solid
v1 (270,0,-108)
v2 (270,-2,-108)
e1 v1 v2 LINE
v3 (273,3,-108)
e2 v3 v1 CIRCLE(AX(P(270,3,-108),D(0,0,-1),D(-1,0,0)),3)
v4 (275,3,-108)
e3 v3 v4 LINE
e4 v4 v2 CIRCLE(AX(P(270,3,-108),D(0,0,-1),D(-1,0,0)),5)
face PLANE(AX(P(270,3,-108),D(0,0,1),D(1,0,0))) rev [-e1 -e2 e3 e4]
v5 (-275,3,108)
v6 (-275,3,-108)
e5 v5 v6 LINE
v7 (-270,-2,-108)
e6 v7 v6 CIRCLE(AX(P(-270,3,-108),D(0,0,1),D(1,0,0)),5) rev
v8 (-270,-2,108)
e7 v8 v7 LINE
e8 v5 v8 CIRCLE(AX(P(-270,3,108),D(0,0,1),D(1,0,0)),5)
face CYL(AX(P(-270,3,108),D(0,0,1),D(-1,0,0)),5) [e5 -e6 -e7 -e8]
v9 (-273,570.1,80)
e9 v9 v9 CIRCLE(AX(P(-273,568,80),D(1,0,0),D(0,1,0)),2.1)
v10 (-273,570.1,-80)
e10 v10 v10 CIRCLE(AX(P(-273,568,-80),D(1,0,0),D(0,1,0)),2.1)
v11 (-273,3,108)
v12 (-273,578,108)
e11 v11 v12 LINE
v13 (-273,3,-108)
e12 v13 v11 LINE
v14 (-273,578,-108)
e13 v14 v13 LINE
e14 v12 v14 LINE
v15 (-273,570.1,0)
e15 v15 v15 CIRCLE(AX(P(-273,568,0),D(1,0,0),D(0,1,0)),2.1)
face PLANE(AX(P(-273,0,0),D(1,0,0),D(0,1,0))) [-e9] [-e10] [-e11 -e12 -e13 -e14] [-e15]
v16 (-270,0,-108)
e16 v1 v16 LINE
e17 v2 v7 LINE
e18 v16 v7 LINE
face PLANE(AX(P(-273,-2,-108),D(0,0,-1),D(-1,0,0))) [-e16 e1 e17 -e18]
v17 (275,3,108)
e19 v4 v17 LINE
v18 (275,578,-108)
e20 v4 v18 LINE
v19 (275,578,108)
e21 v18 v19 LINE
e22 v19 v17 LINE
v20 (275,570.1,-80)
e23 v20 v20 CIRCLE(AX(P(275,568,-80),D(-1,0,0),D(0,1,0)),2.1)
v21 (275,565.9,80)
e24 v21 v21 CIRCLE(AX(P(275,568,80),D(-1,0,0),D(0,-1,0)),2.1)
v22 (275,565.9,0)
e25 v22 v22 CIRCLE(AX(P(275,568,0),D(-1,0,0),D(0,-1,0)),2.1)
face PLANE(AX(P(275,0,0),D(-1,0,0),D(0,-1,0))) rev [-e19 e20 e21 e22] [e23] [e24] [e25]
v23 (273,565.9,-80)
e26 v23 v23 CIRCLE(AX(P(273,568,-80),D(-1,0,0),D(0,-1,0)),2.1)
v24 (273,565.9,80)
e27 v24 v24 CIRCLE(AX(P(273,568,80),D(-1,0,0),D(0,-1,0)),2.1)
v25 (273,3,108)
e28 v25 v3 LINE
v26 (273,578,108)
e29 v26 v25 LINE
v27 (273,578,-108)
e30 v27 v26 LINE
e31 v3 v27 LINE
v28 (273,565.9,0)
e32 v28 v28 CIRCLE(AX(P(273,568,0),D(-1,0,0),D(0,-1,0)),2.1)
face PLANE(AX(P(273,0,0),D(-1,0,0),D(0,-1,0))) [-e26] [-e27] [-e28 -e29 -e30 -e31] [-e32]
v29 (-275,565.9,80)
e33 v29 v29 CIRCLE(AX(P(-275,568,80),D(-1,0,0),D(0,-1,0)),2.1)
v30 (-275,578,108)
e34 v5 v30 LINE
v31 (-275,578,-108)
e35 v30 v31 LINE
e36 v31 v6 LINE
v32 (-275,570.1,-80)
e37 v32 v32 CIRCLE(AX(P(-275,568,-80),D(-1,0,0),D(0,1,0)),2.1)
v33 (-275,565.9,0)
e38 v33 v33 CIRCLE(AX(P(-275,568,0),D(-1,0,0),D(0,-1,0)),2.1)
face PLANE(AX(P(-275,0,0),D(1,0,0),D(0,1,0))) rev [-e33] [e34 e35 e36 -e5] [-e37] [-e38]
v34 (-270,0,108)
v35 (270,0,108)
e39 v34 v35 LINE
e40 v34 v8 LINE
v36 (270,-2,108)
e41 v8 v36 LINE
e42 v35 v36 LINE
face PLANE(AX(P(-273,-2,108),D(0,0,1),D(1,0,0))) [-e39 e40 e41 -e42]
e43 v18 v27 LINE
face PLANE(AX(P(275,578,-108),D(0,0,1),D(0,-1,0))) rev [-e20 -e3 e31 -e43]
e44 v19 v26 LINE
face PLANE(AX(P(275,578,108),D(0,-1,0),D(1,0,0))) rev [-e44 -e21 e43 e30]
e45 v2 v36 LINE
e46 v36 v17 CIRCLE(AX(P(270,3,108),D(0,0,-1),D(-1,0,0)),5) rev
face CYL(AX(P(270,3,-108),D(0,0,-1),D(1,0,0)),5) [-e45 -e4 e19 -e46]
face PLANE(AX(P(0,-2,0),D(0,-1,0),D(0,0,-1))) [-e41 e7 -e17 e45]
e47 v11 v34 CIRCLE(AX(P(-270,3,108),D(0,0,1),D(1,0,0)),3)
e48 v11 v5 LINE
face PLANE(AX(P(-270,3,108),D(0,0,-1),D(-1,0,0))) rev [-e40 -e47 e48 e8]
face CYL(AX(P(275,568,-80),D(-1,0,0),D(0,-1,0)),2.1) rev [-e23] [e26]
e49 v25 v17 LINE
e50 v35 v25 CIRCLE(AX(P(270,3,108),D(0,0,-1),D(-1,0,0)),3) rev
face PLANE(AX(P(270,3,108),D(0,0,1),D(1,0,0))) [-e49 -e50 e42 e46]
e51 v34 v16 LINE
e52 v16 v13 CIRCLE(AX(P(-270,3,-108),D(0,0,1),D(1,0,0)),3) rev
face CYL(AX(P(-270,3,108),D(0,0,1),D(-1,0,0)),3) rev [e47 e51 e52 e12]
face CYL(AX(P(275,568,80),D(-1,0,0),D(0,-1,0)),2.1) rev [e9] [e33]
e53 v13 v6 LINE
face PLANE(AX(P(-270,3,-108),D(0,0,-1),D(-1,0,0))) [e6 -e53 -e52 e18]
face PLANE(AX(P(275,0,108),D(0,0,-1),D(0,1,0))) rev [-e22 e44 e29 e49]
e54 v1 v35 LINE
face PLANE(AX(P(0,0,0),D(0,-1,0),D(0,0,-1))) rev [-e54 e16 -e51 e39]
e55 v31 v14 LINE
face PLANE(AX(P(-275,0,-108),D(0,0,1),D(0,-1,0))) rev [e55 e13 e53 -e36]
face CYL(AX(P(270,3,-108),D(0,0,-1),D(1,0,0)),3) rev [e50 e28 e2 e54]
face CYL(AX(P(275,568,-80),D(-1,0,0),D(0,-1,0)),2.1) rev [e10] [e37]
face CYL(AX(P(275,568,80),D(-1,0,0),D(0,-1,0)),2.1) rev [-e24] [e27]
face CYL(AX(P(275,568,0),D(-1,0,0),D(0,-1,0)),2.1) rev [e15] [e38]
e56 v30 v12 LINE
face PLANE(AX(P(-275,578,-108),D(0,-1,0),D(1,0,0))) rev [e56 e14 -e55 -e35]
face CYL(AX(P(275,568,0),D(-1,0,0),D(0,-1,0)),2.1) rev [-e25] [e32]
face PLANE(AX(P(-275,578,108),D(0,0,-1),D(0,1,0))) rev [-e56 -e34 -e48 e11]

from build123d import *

# Parameters (mm, degrees)
SZKIC1_W                             = 546
SZKIC1_H                             = 216
ODGI_CIE_BAZOWE1_DEPTH               = 2
ODGI_CIE_KRAW_DZI1_STRIP_W           = 14
ODGI_CIE_KRAW_DZI1_STRIP_H           = 2
ODGI_CIE_KRAW_DZI1_STRIP_CUT_DEPTH   = 216
ODGI_CIE_KRAW_DZI1_STRIP_2_W         = 14
ODGI_CIE_KRAW_DZI1_STRIP_2_H         = 2
ODGI_CIE_KRAW_DZI1_STRIP_CUT_2_DEPTH = 216
ODGI_CIE_KRAW_DZI1_DEPTH             = 216
ODGI_CIE_KRAW_DZI1_BEND_DEPTH        = 216
SZKIC12_R                            = 2.1
WYTNIJ_WYCI_GNI_CIE1_DEPTH           = 806.138497403


# Sheet-metal steps are written as plain solids
with BuildPart() as part:
    # Szkic1 → Odgięcie bazowe1 (new body)
    with BuildSketch(Plane(origin=(0, 0, 0), x_dir=(1, 0, 0), z_dir=(0, 1, 0))):
        Rectangle(SZKIC1_W, SZKIC1_H)
    extrude(amount=-ODGI_CIE_BAZOWE1_DEPTH)

    # Odgięcie krawędzi1 strip (across the edge) → Odgięcie krawędzi1 strip cut (cut)
    with BuildSketch(Plane(origin=(-273, 0, -108), x_dir=(1, 0, 0), z_dir=(0, 0, 1))):
        with Locations((-4, -1)):
            Rectangle(ODGI_CIE_KRAW_DZI1_STRIP_W, ODGI_CIE_KRAW_DZI1_STRIP_H)
    extrude(amount=ODGI_CIE_KRAW_DZI1_STRIP_CUT_DEPTH, mode=Mode.SUBTRACT)

    # Odgięcie krawędzi1 strip 2 (across the edge) → Odgięcie krawędzi1 strip cut 2 (cut)
    with BuildSketch(Plane(origin=(273, 0, 108), x_dir=(-1, 0, 0), z_dir=(0, 0, -1))):
        with Locations((-4, -1)):
            Rectangle(ODGI_CIE_KRAW_DZI1_STRIP_2_W, ODGI_CIE_KRAW_DZI1_STRIP_2_H)
    extrude(amount=ODGI_CIE_KRAW_DZI1_STRIP_CUT_2_DEPTH, mode=Mode.SUBTRACT)

    # Odgięcie krawędzi1 section (across the edge) → Odgięcie krawędzi1 (add)
    with BuildSketch(Plane(origin=(-273, 0, -108), x_dir=(1, 0, 0), z_dir=(0, 0, 1))):
        with BuildLine():
            Line((-2, 3), (-2, 578))
            Line((-2, 578), (0, 578))
            Line((0, 578), (0, 3))
            ThreePointArc((0, 3), (0.878679656, 0.878679656), (3, 0))
            Line((3, 0), (3, -2))
            ThreePointArc((3, -2), (-0.535533906, -0.535533906), (-2, 3))
        make_face()
    extrude(amount=ODGI_CIE_KRAW_DZI1_DEPTH)

    # Odgięcie krawędzi1 section 2 (across the edge) → Odgięcie krawędzi1 bend (add)
    with BuildSketch(Plane(origin=(273, 0, 108), x_dir=(-1, 0, 0), z_dir=(0, 0, -1))):
        with BuildLine():
            Line((-2, 3), (-2, 578))
            Line((-2, 578), (0, 578))
            Line((0, 578), (0, 3))
            ThreePointArc((0, 3), (0.878679656, 0.878679656), (3, 0))
            Line((3, 0), (3, -2))
            ThreePointArc((3, -2), (-0.535533906, -0.535533906), (-2, 3))
        make_face()
    extrude(amount=ODGI_CIE_KRAW_DZI1_BEND_DEPTH)

    # Szkic12 → Wytnij-wyciągnięcie1 (cut, through all)
    with BuildSketch(Plane.ZY.offset(275)):
        with Locations(Location((0, 568, 0), (0, 0, 270))):
            Circle(SZKIC12_R)
        with Locations(Location((80, 568, 0), (0, 0, 270))):
            Circle(SZKIC12_R)
        with Locations(Location((-80, 568, 0), (0, 0, 270))):
            Circle(SZKIC12_R)
    extrude(amount=-WYTNIJ_WYCI_GNI_CIE1_DEPTH, mode=Mode.SUBTRACT)


solid = part.part
